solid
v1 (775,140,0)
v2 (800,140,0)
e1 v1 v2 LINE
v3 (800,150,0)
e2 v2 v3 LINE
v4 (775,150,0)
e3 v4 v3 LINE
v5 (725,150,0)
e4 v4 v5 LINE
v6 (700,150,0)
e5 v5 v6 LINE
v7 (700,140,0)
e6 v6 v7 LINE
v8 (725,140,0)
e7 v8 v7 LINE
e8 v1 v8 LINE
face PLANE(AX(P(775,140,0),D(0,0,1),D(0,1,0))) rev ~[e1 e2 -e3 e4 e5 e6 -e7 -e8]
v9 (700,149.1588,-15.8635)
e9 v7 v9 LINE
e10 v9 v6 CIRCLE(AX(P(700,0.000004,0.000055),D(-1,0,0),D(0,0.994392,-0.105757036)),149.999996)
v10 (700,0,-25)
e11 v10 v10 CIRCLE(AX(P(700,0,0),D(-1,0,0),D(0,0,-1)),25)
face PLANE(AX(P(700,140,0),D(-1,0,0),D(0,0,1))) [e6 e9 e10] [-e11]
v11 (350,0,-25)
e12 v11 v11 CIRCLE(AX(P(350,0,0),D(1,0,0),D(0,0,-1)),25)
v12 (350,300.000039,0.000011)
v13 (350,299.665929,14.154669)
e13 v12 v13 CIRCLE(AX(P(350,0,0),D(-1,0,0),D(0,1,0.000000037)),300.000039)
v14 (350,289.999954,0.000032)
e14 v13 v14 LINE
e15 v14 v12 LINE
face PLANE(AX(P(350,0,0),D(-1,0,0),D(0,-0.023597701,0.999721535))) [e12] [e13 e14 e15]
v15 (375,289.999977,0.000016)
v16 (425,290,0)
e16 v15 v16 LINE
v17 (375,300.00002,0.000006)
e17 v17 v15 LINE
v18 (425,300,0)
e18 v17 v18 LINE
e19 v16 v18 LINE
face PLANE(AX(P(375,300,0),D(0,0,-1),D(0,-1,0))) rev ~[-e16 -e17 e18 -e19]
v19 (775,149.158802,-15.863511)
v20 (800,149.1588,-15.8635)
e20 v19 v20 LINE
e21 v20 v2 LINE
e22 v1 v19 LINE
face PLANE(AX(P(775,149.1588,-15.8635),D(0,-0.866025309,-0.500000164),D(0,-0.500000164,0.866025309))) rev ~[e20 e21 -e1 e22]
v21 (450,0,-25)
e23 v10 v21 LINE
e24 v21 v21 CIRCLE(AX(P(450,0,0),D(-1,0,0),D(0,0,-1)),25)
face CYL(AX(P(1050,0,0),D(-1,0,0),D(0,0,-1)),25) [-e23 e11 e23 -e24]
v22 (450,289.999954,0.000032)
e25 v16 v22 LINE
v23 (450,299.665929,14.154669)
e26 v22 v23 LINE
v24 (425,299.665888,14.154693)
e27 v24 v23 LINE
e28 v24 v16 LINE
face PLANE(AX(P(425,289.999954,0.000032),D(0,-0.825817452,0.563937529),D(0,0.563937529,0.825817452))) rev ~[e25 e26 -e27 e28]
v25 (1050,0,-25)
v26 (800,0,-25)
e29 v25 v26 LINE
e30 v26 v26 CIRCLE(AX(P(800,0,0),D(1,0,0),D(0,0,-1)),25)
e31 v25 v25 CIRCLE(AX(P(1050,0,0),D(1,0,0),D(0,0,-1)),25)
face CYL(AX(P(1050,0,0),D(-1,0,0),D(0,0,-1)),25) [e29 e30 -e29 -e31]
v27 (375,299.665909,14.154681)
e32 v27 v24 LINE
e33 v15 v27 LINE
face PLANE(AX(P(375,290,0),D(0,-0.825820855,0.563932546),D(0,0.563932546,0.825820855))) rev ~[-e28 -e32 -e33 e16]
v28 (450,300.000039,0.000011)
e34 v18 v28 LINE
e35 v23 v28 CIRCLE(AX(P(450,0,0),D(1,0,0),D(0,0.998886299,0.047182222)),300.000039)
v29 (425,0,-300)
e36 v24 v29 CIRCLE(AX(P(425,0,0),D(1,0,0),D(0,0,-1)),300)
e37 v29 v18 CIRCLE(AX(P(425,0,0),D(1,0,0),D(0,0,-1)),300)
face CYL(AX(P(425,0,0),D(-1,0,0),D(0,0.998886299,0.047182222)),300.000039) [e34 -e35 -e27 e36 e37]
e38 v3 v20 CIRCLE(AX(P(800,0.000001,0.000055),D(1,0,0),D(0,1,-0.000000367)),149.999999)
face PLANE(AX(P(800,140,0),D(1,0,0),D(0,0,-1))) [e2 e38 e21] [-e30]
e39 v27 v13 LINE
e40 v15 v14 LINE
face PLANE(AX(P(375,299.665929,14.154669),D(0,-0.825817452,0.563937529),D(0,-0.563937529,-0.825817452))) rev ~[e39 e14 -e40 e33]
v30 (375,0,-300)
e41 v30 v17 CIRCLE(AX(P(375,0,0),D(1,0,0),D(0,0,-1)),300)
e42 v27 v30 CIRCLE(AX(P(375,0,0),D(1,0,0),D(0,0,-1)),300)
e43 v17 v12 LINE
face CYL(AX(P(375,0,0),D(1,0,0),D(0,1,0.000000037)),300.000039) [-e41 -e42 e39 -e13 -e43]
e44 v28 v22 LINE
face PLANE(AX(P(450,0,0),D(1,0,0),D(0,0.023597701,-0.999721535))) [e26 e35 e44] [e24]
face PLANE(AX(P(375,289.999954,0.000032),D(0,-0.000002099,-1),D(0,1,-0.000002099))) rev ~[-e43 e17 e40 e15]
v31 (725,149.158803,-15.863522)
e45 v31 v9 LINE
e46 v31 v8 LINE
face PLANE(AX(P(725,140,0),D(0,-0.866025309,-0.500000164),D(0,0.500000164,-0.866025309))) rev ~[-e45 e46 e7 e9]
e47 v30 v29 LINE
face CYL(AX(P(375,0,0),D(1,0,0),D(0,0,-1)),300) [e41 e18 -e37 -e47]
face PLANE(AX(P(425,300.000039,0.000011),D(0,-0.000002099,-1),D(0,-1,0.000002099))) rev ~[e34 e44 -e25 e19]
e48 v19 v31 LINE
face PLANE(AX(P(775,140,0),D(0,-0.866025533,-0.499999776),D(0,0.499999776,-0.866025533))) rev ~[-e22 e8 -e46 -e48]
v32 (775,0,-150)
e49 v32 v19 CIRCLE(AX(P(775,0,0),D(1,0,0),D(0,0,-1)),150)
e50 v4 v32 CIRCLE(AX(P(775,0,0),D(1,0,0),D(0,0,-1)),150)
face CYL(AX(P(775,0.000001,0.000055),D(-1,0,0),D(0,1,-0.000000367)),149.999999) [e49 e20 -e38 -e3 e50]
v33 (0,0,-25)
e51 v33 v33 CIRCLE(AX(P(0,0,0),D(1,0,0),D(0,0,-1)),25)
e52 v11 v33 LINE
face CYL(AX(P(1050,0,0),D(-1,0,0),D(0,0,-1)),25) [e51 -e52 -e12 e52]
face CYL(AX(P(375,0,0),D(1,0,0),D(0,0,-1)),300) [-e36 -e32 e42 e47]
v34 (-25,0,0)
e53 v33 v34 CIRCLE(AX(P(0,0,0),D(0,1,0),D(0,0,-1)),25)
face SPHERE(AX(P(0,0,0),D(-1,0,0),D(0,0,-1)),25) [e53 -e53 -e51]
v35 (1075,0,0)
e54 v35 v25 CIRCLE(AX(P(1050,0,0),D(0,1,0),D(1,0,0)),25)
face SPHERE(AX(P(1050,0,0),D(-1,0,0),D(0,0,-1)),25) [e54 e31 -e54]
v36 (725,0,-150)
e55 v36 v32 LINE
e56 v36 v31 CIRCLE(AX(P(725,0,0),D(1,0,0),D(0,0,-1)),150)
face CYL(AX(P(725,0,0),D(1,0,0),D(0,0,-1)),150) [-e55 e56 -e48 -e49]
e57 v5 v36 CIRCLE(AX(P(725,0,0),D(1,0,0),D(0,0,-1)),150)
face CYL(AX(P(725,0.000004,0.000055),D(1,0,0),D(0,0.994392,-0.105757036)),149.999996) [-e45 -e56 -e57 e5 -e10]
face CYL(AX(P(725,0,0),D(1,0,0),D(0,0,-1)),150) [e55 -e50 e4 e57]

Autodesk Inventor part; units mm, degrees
ref_plane "YZ Plane" through (0, 0, 0) normal (1, 0, 0) x (0, 1, 0)
ref_plane "XZ Plane" through (0, 0, 0) normal (0, 1, 0) x (-1, 0, 0)
ref_plane "XY Plane" through (0, 0, 0) normal (0, 0, 1) x (1, 0, 0)
sketch "Sketch1" plane through (0, 0, 0) normal (0, 1, 0) x (-1, 0, 0)
  line L0 (0, 0) -> (-400, 0) construction
  line L1 (-400, 0) -> (-750, 0)
  line L2 (-750, 0) -> (-1050, 0)
  line L3 (-400, 0) -> (-400, -300) construction
  line L4 (-400, -300) -> (-375, -300) construction
  line L5 (-375, -300) -> (-425, -300)
  line L6 (-425, -300) -> (-425, 0)
  line L7 (-425, 0) -> (-375, 0)
  line L8 (-375, 0) -> (-375, -300)
  line L9 (0, 0) -> (-1050, 0)
  line L10 (-1050, 0) -> (-1050, -25)
  line L11 (-1050, -25) -> (0, -25)
  line L12 (0, -25) -> (0, 0)
  arc A0 (0, -25) -> (25, 0) centre (0, 0) ccw
  line L13 (0, 0) -> (25, 0) construction
  line L14 (-750, 0) -> (-750, -150) construction
  line L15 (-750, -150) -> (-725, -150) construction
  line L16 (-725, -150) -> (-775, -150)
  line L17 (-775, -150) -> (-775, 0)
  line L18 (-775, 0) -> (-725, 0)
  line L19 (-725, 0) -> (-725, -150)
  arc A1 (-1075, 0) -> (-1050, -25) centre (-1050, 0) ccw
  line L20 (-1050, 0) -> (-1075, 0)
  line L21 (25, 0) -> (0, 0)
  point P0 (-775, -25)
  point P1 (-725, -25)
  point P2 (-425, -25)
  point P3 (-375, -25)
  dimension "d0" = 400
  dimension "d1" = 350
  dimension "d2" = 300
  dimension "d3" = 300
  dimension "d4" = 25
  dimension "d5" = 50
  dimension "d6" = 1050
  dimension "d7" = 25
  dimension "d8" = 150
  dimension "d9" = 25
  dimension "d10" = 50
revolve "Revolution1" add sketch "Sketch1" angle 360 about axis through (0, 0, 0) along (1, 0, 0)
sketch "Sketch2" plane through (375, 0, 0) normal (-1, 0, 0) x (0, 0, 1)
  circle A0 centre (0, 0) radius 300 projected
  line L0 (0, 300) -> (0, 290)
  line L1 (0, 290) -> (25.5833, 307.4702)
  point P0 (14.1547, 299.6659)
  dimension "d12" = 10
extrude "Extrusion1" cut sketch "Sketch2" against normal blind 284.25 contours A0 L1 L0 picked at (7.8644, 296.5058)
sketch "Sketch3" plane through (775, 0, 0) normal (1, 0, 0) x (0, 0, -1)
  circle A0 centre (0, 0) radius 150 projected
  line L0 (0, 150) -> (0, 140)
  line L1 (0, 140) -> (62.4254, 176.0413)
  point P0 (15.8635, 149.1588)
  dimension "d15" = 10
  dimension "d16" = 60
extrude "Extrusion2" cut sketch "Sketch3" against normal blind 139 contours A0 L1 L0 picked at (8.8167, 146.2616)
sketch "Sketch4" plane through (375, 0, 0) normal (-1, 0, 0) x (0, -0.0235977, 0.9997215)
  line L0 (7.0793, 299.9165) -> (-6.8433, 289.9192) projected
  line L1 (-6.8433, 289.9192) -> (-7.0793, 299.9165) projected
  arc A0 (-7.0793, 299.9165) -> (7.0793, 299.9165) centre (0, 0) ccw projected
  circle A1 centre (0, 0) radius 25 projected
sketch "Sketch5" plane through (425, 0, 0) normal (1, 0, 0) x (0, 0.0235977, -0.9997215)
  line L0 (6.8433, 289.9192) -> (-7.0793, 299.9165) projected
  arc A0 (-7.0793, 299.9165) -> (7.0793, 299.9165) centre (0, 0) ccw projected
  line L1 (7.0793, 299.9165) -> (6.8433, 289.9192) projected
  circle A1 centre (0, 0) radius 25 projected
sketch "Sketch6" plane through (725, 140, 0) normal (-1, 0, 0) x (0, 0, 1)
  line L0 (0, 0) -> (-15.8635, 9.1588) projected
  arc A0 (-15.8635, 9.1588) -> (0, 10) centre (0, -140) ccw projected
  line L1 (0, 10) -> (0, 0) projected
  circle A1 centre (0, -140) radius 25 projected
sketch "Sketch7" plane through (775, 140, 0) normal (1, 0, 0) x (0, 0, -1)
  circle A0 centre (0, -140) radius 25 projected
  line L0 (15.8635, 9.1588) -> (0, 0) projected
  line L1 (0, 0) -> (0, 10) projected
  arc A1 (0, 10) -> (15.8635, 9.1588) centre (0, -140) ccw projected
extrude "Extrusion3" add sketch "Sketch6" along normal blind 25 contours L1 A0 L0 | A1
extrude "Extrusion4" add sketch "Sketch7" along normal blind 25
extrude "Extrusion5" add sketch "Sketch5" along normal blind 25
extrude "Extrusion6" add sketch "Sketch4" along normal blind 25
properties part number "shaft_model_10cm" material "Steel"
